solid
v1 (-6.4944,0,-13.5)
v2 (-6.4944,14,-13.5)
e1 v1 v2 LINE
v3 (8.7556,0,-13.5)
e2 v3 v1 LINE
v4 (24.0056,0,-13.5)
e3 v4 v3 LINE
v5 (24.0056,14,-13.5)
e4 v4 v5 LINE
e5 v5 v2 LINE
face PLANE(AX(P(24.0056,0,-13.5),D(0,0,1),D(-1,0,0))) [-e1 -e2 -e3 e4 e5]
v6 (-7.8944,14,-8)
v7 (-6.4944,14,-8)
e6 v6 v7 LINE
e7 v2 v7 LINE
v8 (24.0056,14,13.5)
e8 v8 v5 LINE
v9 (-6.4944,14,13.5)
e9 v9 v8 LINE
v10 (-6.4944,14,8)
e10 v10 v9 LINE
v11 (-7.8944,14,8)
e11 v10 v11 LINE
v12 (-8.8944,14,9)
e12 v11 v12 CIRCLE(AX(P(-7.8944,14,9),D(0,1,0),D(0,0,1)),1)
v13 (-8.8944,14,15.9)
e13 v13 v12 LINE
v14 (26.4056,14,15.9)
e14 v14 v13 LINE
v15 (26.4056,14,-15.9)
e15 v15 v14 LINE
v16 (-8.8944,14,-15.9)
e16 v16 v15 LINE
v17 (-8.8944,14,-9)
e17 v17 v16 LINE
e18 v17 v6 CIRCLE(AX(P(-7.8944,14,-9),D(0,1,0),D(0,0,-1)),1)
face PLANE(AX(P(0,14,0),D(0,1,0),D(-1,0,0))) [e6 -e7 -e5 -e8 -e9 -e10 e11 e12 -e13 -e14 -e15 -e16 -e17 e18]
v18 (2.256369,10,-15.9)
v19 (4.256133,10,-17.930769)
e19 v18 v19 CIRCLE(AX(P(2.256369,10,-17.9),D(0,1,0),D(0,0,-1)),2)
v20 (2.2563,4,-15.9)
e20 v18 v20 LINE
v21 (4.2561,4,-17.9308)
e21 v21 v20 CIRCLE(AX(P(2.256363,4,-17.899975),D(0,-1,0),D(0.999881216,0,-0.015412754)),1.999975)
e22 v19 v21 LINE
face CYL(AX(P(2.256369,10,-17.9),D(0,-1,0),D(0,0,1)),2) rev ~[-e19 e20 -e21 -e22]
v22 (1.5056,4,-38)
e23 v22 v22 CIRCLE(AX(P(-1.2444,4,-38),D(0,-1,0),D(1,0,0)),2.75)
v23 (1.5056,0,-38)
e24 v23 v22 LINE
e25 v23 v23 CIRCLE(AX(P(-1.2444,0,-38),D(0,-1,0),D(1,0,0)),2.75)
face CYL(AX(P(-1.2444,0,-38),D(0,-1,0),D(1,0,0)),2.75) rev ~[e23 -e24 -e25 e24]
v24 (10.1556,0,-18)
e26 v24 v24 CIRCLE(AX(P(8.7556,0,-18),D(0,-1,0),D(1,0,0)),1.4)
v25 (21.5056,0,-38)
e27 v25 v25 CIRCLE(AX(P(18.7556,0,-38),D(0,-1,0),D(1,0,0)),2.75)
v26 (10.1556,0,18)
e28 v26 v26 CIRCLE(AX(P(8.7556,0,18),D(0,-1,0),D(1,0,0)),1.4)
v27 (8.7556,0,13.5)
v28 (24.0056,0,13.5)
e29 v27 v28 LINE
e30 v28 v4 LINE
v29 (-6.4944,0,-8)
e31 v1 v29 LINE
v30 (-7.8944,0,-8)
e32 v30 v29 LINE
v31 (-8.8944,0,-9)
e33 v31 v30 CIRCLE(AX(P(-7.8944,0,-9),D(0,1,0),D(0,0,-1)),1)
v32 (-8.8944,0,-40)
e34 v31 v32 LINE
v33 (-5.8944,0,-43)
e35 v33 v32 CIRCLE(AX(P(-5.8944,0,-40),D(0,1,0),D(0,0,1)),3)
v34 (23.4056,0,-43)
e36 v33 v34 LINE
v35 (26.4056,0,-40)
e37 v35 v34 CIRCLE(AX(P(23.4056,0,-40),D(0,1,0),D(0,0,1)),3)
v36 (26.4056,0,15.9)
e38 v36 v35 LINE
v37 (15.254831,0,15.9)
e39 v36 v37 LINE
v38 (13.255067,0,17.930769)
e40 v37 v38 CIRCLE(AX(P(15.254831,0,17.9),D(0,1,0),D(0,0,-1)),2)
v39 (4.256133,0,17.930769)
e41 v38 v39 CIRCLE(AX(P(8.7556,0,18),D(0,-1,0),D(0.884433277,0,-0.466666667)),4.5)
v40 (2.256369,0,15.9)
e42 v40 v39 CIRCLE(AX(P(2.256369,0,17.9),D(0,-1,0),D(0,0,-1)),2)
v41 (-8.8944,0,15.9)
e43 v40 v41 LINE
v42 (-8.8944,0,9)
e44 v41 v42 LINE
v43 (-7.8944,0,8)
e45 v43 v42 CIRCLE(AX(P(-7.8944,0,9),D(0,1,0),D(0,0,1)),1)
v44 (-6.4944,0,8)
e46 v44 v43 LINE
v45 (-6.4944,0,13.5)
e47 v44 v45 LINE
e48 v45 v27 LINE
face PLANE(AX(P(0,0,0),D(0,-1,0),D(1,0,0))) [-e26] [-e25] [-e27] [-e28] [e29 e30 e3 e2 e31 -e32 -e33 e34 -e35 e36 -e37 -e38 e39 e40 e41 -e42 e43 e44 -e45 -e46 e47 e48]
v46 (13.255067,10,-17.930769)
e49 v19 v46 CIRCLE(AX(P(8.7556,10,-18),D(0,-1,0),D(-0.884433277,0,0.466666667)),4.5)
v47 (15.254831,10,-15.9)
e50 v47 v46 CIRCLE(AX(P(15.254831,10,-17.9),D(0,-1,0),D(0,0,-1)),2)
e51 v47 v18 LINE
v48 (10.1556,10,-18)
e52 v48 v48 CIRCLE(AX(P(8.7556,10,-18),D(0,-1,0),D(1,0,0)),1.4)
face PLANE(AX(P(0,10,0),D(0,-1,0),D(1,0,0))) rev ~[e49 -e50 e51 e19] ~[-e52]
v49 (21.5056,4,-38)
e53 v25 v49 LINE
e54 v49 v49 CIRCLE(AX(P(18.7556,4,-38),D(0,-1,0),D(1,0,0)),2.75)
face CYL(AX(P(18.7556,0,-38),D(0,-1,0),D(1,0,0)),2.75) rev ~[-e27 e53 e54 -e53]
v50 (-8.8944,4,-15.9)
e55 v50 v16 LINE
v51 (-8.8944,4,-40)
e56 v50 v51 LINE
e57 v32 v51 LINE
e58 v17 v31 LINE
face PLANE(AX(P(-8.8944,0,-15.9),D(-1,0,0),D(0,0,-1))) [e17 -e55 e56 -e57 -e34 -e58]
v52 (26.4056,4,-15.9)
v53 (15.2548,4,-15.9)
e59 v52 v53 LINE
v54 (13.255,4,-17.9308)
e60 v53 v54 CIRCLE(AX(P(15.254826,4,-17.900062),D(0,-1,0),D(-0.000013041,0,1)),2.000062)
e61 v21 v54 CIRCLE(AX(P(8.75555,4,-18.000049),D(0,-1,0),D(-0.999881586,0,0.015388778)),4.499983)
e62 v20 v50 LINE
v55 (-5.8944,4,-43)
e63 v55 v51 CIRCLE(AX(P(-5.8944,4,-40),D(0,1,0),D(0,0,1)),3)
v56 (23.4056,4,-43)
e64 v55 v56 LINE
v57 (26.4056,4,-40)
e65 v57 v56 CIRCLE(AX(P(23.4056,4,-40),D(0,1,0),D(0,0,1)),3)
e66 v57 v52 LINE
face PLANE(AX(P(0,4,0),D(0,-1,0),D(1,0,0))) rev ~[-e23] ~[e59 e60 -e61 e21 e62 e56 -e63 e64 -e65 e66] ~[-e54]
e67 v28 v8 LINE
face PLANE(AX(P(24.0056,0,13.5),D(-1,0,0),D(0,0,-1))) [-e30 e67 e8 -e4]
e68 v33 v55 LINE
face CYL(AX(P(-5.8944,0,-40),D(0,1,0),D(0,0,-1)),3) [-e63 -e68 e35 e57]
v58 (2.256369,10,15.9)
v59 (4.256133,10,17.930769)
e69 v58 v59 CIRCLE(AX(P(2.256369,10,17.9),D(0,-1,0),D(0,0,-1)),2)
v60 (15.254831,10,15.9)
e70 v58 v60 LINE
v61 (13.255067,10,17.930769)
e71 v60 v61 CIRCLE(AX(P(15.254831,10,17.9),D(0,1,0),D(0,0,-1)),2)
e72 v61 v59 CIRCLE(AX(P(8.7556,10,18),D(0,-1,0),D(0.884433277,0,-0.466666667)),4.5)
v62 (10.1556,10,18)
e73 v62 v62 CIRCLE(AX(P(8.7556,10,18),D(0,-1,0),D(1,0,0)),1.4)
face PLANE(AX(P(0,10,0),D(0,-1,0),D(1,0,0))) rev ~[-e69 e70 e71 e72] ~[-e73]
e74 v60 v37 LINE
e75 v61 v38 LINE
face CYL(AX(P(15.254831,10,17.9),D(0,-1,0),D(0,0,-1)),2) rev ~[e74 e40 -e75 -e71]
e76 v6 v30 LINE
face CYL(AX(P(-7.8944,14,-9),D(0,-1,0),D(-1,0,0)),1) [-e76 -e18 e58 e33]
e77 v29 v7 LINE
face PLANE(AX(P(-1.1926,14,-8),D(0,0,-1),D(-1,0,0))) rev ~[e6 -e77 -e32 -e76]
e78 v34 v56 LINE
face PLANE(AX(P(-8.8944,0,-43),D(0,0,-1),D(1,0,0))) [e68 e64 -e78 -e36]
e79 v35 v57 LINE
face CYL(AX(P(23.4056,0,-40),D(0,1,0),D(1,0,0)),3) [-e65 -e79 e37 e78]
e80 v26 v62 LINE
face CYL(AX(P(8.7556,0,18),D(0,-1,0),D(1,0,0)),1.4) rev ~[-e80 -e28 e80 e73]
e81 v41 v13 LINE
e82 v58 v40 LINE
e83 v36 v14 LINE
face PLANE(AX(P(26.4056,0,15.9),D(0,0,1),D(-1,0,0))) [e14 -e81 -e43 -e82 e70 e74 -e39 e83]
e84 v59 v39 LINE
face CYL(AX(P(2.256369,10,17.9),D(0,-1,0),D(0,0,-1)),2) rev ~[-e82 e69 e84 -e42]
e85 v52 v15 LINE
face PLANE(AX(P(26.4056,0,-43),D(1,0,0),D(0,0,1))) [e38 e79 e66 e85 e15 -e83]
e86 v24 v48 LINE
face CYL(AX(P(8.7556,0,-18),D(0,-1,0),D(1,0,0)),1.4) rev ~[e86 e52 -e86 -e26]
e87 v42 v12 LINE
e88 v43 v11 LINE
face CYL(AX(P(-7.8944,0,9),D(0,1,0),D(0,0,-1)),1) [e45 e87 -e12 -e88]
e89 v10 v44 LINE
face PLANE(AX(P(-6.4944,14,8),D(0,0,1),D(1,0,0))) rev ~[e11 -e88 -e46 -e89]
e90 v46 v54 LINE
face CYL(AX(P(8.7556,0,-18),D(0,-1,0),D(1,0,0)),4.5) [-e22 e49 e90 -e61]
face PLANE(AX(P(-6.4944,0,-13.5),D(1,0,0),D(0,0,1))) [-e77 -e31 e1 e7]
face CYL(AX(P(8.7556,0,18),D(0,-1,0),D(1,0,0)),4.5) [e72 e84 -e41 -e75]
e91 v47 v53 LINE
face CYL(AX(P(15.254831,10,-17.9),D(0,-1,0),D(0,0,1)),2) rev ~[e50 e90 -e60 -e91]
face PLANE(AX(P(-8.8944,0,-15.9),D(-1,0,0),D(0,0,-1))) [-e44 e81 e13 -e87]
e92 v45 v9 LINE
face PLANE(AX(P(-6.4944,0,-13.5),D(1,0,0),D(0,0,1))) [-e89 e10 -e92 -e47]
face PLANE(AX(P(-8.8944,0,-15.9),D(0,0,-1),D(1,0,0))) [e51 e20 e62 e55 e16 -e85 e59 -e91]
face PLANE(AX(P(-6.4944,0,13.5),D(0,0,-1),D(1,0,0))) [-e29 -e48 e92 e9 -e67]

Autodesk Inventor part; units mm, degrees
ref_plane "YZ Plane" through (0, 0, 0) normal (1, 0, 0) x (0, 1, 0)
ref_plane "XZ Plane" through (0, 0, 0) normal (0, 1, 0) x (-1, 0, 0)
ref_plane "XY Plane" through (0, 0, 0) normal (0, 0, 1) x (1, 0, 0)
sketch "Sketch1" plane through (0, 0, 0) normal (0, 1, 0) x (-1, 0, 0)
  line L0 (-26.4056, 15.9) -> (8.8944, 15.9)
  line L1 (8.8944, 15.9) -> (8.8944, -15.9)
  line L2 (8.8944, -15.9) -> (-26.4056, -15.9)
  line L3 (-26.4056, -15.9) -> (-26.4056, 15.9)
  line L4 (6.4944, 13.5) -> (-24.0056, 13.5)
  line L5 (-24.0056, 13.5) -> (-24.0056, -13.5)
  line L6 (-24.0056, -13.5) -> (6.4944, -13.5)
  line L7 (6.4944, -13.5) -> (6.4944, 13.5)
  point P0 (0, 0)
  dimension "d4" = 27
  dimension "d5" = 30.5
  dimension "d7" = 2.4
  dimension "d8" = 2.4
  dimension "d9" = 2.4
  dimension "d10" = 2.4
extrude "Extrusion1" add sketch "Sketch1" along normal blind 14
sketch "Sketch2" plane through (0, 0, 0) normal (0, -1, 0) x (1, 0, 0)
  circle A0 centre (8.7556, 18) radius 1.4
  circle A1 centre (8.7556, -18) radius 1.4
  line L0 (24.0056, -13.5) -> (24.0056, 13.5) projected
  circle A2 centre (8.7556, 18) radius 4.5
  circle A3 centre (8.7556, -18) radius 4.5
  line L1 (-6.4944, -13.5) -> (24.0056, -13.5) projected
  point P0 (0, 0)
  dimension "d13" = 36
  dimension "d14" = 15.25
  dimension "d15" = 2.8
  dimension "d16" = 18
extrude "Extrusion2" add sketch "Sketch2" against normal blind 10
fillet "Fillet1" radius 2 4 edges at (12.7355, 5, -15.9) (4.7756, 5, -15.9) (4.7756, 5, 15.9) (12.7355, 5, 15.9)
sketch "Sketch3" plane through (0, 0, 0) normal (0, -1, 0) x (1, 0, 0)
  circle A0 centre (8.7556, -18) radius 1.4 projected
  circle A1 centre (8.7556, 18) radius 1.4 projected
  line L0 (26.4056, -15.9) -> (15.2548, -15.9) projected
  line L1 (26.4056, 15.9) -> (26.4056, -15.9) projected
  line L2 (15.2548, 15.9) -> (26.4056, 15.9) projected
  arc A2 (13.255, 17.9308) -> (15.2548, 15.9) centre (15.2548, 17.9) ccw projected
  arc A3 (13.255, 17.9308) -> (4.2561, 17.9308) centre (8.7556, 18) ccw projected
  arc A4 (2.2563, 15.9) -> (4.2561, 17.9308) centre (2.2563, 17.9) ccw projected
  line L3 (-8.8944, 15.9) -> (2.2563, 15.9) projected
  line L4 (-8.8944, -15.9) -> (-8.8944, 15.9) projected
  line L5 (2.2563, -15.9) -> (-8.8944, -15.9) projected
  arc A5 (4.2561, -17.9308) -> (2.2563, -15.9) centre (2.2563, -17.9) ccw projected
  arc A6 (4.2561, -17.9308) -> (13.255, -17.9308) centre (8.7556, -18) ccw projected
  arc A7 (15.2548, -15.9) -> (13.255, -17.9308) centre (15.2548, -17.9) ccw projected
  line L6 (-6.4944, -13.5) -> (24.0056, -13.5) projected
  line L7 (-6.4944, 13.5) -> (-6.4944, -13.5) projected
  line L8 (24.0056, 13.5) -> (-6.4944, 13.5) projected
  line L9 (24.0056, -13.5) -> (24.0056, 13.5) projected
  line L10 (26.4056, 15.9) -> (26.4056, -15.9) projected
  line L11 (26.4056, -15.9) -> (-8.8944, -15.9)
  line L12 (-8.8944, -15.9) -> (-8.8944, -43)
  line L13 (-8.8944, -43) -> (26.4056, -43)
  line L14 (26.4056, -43) -> (26.4056, -15.9)
  circle A8 centre (18.7556, -38) radius 2.75
  circle A9 centre (-1.2444, -38) radius 2.75
  line L15 (-8.8944, -15.9) -> (-8.8944, 15.9) projected
  point P0 (0, 0)
  dimension "d20" = 5.5
  dimension "d21" = 20
  dimension "d22" = 20
  dimension "d23" = 5
  dimension "d25" = 10
extrude "Extrusion3" add sketch "Sketch3" against normal blind 4 contours L14 L13 L12 L5 A5 A6 A7 L0
fillet "Fillet2" radius 3 2 edges at (26.4056, 2, -43) (-8.8944, 2, -43)
sketch "Sketch4" plane through (0, 14, 0) normal (0, 1, 0) x (1, 0, 0)
  line L0 (-1.1926, 8) -> (-11.7963, 8)
  line L1 (-11.7963, 8) -> (-11.7963, -8)
  line L2 (-11.7963, -8) -> (-1.1926, -8)
  line L3 (-1.1926, -8) -> (-1.1926, 8)
  line L4 (-6.4944, -13.5) -> (-6.4944, 13.5) projected
  line L5 (-1.1926, 8) -> (-11.7963, -8) construction
  line L6 (-11.7963, 8) -> (-1.1926, -8) construction
  point P0 (0, 0)
  point P1 (-6.4944, 0)
  dimension "d29" = 8
extrude "Extrusion4" cut sketch "Sketch4" against normal through all
fillet "Fillet3" radius 1 2 edges at (-8.8944, 7, -8) (-8.8944, 7, 8)
properties part number "SocketMount"
